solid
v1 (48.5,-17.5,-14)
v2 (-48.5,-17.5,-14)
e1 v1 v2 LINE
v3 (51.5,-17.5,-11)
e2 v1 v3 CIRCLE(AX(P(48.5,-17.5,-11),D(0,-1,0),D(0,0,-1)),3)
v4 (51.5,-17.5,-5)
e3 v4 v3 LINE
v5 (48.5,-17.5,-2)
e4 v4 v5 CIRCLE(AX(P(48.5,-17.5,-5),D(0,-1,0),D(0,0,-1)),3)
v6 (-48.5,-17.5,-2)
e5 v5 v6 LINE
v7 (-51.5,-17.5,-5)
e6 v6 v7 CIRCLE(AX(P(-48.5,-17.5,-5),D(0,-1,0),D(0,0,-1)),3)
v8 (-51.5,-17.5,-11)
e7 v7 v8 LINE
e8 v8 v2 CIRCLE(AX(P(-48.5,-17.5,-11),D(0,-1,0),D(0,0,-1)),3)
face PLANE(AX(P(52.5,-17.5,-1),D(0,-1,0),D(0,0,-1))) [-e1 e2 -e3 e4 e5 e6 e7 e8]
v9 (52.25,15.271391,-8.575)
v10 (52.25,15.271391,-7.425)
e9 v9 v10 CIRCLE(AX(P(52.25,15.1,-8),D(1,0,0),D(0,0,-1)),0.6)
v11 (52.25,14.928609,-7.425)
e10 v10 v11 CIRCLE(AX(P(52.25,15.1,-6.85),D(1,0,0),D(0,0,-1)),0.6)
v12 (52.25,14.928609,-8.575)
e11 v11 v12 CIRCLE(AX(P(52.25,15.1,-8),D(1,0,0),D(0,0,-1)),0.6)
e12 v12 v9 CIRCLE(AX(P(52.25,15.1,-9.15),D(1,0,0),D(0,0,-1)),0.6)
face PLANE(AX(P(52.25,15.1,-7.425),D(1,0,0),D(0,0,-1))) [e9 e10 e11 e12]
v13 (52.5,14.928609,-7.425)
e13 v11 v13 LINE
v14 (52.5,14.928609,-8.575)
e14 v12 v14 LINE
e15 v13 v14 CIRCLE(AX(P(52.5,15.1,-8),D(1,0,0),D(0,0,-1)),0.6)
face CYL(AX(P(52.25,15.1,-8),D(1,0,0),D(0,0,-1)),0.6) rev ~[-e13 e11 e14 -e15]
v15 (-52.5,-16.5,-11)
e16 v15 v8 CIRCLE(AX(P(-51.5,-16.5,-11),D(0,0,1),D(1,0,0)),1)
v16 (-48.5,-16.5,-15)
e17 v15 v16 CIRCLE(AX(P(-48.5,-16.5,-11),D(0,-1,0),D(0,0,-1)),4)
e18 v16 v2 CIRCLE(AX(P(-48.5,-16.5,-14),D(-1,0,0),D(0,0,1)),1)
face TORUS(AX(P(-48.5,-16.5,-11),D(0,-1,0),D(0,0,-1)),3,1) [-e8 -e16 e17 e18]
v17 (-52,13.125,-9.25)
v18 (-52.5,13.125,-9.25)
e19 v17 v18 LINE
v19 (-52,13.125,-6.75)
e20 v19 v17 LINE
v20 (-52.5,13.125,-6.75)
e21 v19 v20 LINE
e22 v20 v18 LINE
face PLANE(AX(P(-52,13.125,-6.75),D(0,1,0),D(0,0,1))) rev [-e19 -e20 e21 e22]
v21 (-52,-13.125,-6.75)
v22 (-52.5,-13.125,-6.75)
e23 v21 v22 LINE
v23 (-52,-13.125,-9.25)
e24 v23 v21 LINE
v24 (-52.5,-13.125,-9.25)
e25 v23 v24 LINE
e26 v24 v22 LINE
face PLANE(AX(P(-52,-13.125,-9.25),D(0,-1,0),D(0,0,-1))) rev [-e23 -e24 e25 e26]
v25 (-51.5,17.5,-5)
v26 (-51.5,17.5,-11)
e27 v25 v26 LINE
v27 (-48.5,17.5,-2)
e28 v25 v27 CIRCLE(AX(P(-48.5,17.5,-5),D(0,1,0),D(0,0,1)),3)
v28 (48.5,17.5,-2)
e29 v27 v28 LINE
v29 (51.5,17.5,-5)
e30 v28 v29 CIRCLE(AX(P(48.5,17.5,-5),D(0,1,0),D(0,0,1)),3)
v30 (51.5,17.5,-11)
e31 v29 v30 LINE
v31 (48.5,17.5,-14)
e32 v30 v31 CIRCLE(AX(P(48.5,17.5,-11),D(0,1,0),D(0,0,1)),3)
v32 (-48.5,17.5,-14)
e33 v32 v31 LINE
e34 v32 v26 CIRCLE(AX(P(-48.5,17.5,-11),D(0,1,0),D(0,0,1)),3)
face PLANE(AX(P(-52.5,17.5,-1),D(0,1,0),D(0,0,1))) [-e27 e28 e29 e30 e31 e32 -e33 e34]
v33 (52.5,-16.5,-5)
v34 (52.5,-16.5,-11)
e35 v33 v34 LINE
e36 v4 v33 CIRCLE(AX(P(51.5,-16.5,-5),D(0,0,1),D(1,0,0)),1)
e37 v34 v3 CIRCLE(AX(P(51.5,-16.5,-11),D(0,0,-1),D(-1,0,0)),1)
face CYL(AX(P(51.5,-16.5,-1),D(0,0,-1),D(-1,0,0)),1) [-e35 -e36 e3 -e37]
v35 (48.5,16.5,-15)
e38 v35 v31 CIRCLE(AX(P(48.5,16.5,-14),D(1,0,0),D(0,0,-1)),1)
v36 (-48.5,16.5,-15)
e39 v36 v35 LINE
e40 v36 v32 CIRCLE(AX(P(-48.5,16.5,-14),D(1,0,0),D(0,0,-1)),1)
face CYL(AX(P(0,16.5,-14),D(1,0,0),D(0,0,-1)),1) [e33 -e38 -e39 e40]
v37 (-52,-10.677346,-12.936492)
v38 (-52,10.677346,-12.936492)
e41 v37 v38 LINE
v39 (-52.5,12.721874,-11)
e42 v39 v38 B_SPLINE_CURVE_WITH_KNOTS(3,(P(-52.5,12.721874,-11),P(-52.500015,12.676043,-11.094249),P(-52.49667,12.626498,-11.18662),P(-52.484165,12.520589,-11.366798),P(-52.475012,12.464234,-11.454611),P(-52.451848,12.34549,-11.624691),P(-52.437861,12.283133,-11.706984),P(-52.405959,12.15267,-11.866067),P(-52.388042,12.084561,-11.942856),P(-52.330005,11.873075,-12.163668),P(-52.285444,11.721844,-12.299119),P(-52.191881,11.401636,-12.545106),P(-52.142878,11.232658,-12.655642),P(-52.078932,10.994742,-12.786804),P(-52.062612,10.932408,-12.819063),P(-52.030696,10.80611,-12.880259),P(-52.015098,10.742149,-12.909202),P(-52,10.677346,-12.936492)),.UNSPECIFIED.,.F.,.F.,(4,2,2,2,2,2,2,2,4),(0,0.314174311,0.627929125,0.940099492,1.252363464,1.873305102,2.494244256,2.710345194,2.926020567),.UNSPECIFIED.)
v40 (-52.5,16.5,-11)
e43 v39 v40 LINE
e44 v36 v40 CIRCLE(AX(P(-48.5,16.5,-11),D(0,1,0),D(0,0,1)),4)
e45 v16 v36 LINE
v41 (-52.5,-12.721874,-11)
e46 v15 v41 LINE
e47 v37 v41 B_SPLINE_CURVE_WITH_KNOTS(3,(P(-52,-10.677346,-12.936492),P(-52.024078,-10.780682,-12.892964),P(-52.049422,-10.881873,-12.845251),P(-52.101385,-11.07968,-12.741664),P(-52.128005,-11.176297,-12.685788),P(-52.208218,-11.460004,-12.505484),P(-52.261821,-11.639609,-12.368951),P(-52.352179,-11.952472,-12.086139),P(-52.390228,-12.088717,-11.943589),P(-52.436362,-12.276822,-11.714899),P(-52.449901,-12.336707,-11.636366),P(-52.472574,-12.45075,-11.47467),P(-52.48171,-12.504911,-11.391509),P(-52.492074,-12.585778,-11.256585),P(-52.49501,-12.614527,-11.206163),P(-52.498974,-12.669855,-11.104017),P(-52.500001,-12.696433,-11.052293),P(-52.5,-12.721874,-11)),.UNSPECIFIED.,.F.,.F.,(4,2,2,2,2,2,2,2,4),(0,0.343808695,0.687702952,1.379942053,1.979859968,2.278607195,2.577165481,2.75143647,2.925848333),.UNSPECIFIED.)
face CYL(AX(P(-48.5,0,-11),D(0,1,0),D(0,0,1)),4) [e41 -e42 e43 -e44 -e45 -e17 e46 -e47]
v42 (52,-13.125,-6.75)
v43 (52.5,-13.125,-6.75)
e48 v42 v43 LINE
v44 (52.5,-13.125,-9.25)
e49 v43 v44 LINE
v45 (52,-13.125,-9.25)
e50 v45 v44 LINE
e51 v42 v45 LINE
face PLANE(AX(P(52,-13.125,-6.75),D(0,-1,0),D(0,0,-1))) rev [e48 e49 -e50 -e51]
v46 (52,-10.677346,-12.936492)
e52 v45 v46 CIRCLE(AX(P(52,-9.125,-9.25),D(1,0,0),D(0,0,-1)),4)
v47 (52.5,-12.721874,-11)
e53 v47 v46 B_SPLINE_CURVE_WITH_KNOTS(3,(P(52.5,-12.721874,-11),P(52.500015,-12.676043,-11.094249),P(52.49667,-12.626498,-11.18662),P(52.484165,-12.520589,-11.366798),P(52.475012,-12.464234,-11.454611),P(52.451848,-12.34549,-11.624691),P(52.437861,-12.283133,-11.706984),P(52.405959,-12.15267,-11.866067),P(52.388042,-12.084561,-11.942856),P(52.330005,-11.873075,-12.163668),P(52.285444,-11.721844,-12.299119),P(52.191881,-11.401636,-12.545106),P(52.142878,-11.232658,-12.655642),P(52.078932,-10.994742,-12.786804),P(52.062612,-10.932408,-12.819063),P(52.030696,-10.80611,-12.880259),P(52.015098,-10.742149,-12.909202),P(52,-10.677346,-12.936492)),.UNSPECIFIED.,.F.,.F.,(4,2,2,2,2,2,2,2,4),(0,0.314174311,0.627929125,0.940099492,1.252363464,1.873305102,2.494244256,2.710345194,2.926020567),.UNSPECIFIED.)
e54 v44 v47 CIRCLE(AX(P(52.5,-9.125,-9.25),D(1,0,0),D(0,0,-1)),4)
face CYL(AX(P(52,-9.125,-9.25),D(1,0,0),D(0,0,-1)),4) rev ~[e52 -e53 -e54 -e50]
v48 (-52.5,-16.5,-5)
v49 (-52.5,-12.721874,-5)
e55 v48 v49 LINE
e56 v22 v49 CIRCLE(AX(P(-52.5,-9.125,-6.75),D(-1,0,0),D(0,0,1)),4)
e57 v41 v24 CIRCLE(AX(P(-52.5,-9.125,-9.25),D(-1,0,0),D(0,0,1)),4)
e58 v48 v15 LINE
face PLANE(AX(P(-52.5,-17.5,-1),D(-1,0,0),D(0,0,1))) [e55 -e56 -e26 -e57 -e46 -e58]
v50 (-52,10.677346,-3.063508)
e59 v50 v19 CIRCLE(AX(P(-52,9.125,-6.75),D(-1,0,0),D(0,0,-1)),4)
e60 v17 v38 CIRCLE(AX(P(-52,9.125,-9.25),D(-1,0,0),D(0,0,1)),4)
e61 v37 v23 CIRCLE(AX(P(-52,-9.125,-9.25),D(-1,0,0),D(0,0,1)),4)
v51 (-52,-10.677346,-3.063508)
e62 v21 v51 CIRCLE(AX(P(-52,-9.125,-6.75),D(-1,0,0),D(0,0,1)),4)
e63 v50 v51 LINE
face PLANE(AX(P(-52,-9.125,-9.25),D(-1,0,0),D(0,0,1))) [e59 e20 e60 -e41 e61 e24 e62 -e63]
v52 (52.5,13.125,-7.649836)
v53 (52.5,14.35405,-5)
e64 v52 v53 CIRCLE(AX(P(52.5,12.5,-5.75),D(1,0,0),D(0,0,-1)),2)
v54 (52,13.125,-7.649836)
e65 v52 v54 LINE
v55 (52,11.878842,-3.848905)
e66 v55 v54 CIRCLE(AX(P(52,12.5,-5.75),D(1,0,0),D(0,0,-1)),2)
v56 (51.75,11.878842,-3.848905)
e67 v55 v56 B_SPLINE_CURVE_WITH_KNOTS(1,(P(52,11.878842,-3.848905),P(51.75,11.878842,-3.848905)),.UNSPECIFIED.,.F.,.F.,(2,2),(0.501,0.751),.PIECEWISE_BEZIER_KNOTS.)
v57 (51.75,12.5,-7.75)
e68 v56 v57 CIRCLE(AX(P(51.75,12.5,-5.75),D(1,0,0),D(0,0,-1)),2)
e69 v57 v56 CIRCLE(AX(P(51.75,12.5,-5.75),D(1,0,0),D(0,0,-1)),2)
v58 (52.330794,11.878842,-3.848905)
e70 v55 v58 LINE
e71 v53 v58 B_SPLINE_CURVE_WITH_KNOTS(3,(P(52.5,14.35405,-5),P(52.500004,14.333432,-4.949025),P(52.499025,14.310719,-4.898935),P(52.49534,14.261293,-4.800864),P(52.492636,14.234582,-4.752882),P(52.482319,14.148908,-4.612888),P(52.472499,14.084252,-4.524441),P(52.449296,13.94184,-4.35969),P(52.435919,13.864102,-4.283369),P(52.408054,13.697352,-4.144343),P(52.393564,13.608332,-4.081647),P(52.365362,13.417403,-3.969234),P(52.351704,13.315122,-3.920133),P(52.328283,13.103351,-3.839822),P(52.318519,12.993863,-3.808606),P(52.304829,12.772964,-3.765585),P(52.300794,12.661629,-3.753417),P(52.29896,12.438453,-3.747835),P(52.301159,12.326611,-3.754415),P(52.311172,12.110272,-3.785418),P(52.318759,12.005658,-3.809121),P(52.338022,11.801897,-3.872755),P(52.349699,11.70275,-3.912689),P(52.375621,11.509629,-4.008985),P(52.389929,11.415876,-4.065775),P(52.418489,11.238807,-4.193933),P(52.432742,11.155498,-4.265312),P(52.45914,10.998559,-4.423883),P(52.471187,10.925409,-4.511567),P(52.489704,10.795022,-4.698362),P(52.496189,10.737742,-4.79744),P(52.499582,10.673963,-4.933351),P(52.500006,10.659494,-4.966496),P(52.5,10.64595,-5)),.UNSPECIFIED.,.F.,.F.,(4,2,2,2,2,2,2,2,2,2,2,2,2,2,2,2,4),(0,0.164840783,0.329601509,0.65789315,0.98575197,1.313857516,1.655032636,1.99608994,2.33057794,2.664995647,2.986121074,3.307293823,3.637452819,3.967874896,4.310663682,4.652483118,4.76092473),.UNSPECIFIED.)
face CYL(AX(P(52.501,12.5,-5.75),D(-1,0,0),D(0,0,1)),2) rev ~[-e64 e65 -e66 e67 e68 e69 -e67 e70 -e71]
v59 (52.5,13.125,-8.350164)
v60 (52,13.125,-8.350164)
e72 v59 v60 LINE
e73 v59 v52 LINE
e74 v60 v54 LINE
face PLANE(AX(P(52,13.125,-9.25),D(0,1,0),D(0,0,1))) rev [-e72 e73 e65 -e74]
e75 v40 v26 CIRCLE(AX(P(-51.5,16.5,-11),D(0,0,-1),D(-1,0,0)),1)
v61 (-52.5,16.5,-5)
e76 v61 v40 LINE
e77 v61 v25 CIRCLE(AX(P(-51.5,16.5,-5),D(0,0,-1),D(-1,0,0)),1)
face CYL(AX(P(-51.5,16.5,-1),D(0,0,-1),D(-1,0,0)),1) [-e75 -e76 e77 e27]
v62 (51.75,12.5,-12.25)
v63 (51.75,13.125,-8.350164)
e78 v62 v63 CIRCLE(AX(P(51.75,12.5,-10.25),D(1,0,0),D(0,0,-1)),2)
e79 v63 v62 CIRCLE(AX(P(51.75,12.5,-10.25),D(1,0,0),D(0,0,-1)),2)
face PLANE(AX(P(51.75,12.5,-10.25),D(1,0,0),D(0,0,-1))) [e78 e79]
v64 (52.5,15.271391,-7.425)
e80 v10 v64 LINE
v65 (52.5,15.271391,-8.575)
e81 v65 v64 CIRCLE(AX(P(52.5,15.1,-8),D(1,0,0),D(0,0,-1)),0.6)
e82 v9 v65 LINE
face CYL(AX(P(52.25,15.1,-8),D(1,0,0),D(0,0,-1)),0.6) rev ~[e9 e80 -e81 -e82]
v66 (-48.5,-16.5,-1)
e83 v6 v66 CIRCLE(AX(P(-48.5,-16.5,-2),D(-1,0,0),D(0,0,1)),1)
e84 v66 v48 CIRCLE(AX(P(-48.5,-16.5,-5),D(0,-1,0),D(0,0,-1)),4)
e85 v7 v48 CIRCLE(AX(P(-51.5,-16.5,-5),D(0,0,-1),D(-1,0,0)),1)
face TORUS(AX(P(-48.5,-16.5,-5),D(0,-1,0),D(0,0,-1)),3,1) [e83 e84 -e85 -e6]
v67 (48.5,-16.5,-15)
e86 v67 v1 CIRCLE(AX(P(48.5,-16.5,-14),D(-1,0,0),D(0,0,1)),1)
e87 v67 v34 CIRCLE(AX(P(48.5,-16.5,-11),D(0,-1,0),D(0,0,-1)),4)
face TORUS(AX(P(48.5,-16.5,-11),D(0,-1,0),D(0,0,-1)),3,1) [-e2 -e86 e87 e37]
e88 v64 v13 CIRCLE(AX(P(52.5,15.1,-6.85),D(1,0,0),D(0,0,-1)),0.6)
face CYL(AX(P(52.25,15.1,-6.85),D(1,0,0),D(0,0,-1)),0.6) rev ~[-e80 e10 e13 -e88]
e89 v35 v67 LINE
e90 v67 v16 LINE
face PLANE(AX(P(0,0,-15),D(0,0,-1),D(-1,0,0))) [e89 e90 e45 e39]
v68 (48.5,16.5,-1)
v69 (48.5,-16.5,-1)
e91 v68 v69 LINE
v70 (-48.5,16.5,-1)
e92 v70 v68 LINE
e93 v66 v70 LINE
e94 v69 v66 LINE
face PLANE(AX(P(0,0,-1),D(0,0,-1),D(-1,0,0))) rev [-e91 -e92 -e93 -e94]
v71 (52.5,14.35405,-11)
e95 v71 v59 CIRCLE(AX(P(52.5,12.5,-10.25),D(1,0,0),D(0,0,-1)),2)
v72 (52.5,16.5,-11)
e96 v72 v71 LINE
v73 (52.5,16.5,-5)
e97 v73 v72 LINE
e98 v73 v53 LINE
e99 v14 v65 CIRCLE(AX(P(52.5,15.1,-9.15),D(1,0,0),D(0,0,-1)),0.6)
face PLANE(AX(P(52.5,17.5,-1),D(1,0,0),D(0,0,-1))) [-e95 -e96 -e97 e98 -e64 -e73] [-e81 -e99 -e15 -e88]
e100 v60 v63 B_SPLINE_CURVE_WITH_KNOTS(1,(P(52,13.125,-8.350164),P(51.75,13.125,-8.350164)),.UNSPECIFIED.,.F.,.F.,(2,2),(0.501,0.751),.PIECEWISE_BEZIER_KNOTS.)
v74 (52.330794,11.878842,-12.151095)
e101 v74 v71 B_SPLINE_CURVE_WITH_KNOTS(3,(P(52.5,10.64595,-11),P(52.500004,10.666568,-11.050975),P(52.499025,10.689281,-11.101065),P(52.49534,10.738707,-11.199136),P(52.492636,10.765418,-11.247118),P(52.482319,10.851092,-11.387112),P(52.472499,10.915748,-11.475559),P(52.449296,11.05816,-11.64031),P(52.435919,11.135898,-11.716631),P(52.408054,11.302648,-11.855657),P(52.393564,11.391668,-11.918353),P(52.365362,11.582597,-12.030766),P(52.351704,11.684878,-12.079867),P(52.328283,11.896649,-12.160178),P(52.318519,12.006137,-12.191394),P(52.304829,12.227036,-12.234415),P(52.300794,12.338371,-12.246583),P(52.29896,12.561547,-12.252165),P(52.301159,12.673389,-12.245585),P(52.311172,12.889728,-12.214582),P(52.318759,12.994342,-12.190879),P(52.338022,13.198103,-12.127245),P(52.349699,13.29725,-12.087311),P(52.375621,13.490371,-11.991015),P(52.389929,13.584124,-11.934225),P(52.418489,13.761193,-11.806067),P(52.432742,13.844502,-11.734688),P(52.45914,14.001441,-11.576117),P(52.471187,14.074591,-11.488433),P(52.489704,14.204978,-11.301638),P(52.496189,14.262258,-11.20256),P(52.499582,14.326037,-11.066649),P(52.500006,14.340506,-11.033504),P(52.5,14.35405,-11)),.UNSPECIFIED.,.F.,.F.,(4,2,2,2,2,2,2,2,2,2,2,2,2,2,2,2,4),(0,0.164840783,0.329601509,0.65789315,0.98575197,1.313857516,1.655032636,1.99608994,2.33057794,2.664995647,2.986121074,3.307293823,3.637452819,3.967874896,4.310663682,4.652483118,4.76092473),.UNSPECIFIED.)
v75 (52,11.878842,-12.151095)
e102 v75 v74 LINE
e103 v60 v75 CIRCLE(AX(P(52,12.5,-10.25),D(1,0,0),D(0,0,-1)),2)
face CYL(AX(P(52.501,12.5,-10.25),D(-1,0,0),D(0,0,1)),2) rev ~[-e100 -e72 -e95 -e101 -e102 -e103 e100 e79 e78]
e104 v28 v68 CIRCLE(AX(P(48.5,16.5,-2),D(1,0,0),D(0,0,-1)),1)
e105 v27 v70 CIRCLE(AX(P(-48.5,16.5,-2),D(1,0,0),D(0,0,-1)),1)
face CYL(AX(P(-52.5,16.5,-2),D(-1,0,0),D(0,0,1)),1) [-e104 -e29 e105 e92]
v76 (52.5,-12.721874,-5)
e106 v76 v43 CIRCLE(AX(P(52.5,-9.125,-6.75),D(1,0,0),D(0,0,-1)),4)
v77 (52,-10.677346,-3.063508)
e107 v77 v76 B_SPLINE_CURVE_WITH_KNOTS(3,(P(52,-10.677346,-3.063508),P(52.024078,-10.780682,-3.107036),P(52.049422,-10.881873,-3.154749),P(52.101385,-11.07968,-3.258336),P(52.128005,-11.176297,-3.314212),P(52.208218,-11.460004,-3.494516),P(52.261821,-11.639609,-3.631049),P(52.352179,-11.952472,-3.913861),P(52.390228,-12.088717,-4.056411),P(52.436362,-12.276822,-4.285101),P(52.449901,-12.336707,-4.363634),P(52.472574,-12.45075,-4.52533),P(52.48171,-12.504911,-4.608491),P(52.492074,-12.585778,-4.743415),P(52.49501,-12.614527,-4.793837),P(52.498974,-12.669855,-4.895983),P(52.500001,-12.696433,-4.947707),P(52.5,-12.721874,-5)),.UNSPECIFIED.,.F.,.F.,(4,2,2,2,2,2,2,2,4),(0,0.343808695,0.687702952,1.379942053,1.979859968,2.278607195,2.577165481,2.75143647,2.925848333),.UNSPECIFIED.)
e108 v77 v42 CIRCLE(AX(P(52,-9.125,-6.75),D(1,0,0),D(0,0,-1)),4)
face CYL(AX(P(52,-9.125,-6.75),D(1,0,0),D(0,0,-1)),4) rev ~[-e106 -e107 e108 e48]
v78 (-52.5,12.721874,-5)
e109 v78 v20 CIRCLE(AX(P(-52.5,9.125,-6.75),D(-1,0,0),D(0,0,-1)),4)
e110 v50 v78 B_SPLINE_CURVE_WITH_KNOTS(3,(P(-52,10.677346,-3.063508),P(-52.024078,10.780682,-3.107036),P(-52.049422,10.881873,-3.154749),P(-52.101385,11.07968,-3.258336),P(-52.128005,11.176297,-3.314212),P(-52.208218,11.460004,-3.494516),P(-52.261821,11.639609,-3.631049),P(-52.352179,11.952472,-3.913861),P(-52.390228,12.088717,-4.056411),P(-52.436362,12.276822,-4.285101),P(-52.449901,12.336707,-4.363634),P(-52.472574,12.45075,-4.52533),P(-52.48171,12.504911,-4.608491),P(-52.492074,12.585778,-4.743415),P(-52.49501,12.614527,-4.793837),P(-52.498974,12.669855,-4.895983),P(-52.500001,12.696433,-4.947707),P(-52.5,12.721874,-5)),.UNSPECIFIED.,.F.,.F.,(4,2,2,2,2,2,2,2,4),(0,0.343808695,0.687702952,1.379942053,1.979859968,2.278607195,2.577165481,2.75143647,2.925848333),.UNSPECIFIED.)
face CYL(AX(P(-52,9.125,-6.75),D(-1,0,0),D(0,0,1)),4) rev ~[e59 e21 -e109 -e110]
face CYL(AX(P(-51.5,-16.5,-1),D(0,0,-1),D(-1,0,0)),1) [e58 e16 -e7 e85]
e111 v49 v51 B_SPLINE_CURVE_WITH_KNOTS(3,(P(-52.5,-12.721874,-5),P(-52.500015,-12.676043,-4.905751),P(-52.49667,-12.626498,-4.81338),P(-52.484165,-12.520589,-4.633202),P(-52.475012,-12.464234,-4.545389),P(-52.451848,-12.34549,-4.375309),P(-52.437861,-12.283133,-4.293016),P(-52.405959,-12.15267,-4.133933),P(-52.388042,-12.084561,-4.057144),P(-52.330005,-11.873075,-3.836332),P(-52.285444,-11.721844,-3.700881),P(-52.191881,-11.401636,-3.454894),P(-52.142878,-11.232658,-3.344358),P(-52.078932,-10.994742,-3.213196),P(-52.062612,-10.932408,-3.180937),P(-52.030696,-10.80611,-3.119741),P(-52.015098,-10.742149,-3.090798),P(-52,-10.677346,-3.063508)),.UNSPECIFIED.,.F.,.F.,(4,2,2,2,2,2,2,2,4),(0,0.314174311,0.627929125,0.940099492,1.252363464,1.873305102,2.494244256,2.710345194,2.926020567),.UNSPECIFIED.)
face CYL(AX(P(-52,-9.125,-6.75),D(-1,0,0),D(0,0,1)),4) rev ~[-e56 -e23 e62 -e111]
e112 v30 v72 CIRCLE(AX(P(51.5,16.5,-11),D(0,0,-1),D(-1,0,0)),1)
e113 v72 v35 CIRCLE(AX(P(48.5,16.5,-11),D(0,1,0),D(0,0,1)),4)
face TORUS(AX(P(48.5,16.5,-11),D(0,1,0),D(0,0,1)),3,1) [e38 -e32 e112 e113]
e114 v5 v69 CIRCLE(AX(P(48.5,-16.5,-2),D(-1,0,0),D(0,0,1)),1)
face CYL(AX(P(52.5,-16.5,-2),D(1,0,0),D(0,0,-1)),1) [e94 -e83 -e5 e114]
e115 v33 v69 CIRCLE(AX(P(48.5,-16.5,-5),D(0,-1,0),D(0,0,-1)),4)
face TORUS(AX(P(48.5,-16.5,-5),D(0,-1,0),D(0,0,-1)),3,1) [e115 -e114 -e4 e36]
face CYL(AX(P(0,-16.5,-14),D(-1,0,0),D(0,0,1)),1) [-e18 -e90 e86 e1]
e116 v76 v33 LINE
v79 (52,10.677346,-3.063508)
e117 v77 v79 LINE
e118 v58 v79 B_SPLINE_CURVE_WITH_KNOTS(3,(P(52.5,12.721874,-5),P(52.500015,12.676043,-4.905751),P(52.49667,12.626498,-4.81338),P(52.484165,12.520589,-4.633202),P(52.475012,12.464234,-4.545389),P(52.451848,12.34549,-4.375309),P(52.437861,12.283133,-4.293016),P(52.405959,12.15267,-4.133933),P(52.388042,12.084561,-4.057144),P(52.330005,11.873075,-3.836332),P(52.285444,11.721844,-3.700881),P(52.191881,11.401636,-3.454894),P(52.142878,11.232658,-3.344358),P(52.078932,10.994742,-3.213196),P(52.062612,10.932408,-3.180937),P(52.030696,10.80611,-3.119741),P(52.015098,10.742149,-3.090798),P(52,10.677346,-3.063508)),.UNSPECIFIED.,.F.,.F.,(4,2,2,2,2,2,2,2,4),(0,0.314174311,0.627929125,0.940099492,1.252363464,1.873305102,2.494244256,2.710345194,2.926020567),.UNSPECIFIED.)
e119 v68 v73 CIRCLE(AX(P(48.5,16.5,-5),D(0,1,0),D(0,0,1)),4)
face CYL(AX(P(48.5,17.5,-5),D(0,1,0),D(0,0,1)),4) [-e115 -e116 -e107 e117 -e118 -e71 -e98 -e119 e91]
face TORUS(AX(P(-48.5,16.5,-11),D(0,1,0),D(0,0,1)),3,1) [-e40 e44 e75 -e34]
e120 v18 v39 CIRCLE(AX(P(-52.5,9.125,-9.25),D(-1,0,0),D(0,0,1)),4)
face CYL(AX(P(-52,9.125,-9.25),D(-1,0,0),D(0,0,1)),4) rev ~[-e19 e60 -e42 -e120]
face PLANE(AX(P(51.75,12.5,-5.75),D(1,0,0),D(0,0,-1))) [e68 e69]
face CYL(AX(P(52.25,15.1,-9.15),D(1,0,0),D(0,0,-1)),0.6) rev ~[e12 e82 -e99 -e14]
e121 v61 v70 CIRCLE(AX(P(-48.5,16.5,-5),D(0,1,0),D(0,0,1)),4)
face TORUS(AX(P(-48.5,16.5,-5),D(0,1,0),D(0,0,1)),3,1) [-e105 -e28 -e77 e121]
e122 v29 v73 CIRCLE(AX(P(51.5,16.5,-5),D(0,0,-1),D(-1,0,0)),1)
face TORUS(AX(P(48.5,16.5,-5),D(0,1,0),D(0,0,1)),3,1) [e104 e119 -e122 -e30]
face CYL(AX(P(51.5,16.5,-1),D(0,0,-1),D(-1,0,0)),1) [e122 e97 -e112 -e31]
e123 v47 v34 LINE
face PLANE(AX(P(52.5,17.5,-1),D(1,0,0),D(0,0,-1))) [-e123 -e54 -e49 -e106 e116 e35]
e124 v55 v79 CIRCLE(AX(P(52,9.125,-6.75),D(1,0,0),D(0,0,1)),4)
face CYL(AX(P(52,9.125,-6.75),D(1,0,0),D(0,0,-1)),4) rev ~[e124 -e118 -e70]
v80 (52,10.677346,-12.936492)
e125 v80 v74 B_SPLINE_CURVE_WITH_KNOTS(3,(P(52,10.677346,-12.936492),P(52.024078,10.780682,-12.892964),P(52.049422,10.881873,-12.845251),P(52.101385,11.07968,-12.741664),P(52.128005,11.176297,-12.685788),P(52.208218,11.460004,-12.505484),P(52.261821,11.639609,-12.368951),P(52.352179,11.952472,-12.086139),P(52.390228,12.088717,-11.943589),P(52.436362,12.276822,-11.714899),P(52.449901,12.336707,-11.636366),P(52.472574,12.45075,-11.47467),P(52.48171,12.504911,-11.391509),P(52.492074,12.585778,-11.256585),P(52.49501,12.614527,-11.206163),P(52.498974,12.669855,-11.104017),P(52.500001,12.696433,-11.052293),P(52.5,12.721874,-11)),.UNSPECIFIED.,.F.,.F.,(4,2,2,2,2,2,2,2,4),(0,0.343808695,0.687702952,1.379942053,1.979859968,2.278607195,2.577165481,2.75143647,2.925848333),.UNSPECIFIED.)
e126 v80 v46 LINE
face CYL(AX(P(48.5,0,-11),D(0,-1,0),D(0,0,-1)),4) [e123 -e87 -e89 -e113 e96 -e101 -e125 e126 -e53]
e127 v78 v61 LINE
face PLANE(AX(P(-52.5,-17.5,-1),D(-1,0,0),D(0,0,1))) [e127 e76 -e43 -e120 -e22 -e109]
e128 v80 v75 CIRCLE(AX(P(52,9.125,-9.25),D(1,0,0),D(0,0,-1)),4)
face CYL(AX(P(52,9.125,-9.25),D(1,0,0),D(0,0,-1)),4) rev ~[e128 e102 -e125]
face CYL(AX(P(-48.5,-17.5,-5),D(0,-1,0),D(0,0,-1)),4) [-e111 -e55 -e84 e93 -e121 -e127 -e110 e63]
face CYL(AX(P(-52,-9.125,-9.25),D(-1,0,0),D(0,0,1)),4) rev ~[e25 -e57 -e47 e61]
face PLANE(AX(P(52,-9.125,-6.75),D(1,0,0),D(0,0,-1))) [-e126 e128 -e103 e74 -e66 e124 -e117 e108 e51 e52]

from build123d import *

# Parameters (mm, degrees)
SKETCH1_W                           = 105
SKETCH1_H                           = 35
BOSS_EXTRUDE1_DEPTH                 = 14
CUT_EXTRUDE1_DEPTH                  = 0.5
CUT_EXTRUDE2_START                  = -0.5
CUT_EXTRUDE2_DEPTH                  = 0.5
FILLET1_R                           = 4
FILLET2_R                           = 1
ESQUISSE1_R                         = 2
ENL_V_MAT_EXTRU_1_DEPTH             = 0.25
ENL_V_MAT_EXTRU_1_DIRECTION_2_REACH = 109.012
ENL_V_MAT_EXTRU_4_DEPTH             = 0.25


with BuildPart() as part:
    # Sketch1 → Boss-Extrude1 (new body)
    with BuildSketch(Plane(origin=(0, 0, -15), x_dir=(-1, 0, 0), z_dir=(0, 0, -1))):
        Rectangle(SKETCH1_W, SKETCH1_H)
    extrude(amount=-BOSS_EXTRUDE1_DEPTH)

    # Sketch2 → Cut-Extrude1 (cut)
    with BuildSketch(Plane(origin=(52.5, 0, 0), x_dir=(0, 0, -1), z_dir=(1, 0, 0))):
        with BuildLine():
            Line((2.75, 9.125), (2.75, -9.125))
            ThreePointArc((2.75, -9.125), (3.921572875, -11.953427125), (6.75, -13.125))
            Line((6.75, -13.125), (9.25, -13.125))
            ThreePointArc((9.25, -13.125), (12.078427125, -11.953427125), (13.25, -9.125))
            Line((13.25, -9.125), (13.25, 9.125))
            ThreePointArc((13.25, 9.125), (12.078427125, 11.953427125), (9.25, 13.125))
            Line((9.25, 13.125), (6.75, 13.125))
            ThreePointArc((6.75, 13.125), (3.921572875, 11.953427125), (2.75, 9.125))
        make_face()
    extrude(amount=-CUT_EXTRUDE1_DEPTH, mode=Mode.SUBTRACT)

    # Sketch3 → Cut-Extrude2 (cut)
    with BuildSketch(Plane.ZY.offset(52.5).offset(CUT_EXTRUDE2_START)):
        with BuildLine():
            Line((-6.75, 13.125), (-9.25, 13.125))
            ThreePointArc((-9.25, 13.125), (-12.078427125, 11.953427125), (-13.25, 9.125))
            Line((-13.25, 9.125), (-13.25, -9.125))
            ThreePointArc((-13.25, -9.125), (-12.078427125, -11.953427125), (-9.25, -13.125))
            Line((-9.25, -13.125), (-6.75, -13.125))
            ThreePointArc((-6.75, -13.125), (-3.921572875, -11.953427125), (-2.75, -9.125))
            Line((-2.75, -9.125), (-2.75, 9.125))
            ThreePointArc((-2.75, 9.125), (-3.921572875, 11.953427125), (-6.75, 13.125))
        make_face()
    extrude(amount=CUT_EXTRUDE2_DEPTH, mode=Mode.SUBTRACT)

    # Fillet1
    # the kernel refuses this fillet: 4 mm, written as the material it takes off along each edge
    with BuildSketch(Plane(origin=(-52.5, -27.5, -15), x_dir=(0, 0, 1), z_dir=(0, 1, 0)), Plane(origin=(52.5, 27.5, -15), x_dir=(0, 0, 1), z_dir=(0, -1, 0))) as fillet1_piece_1:
        with BuildLine():
            CenterArc((FILLET1_R, FILLET1_R), FILLET1_R, 180, 90)
            Line((0, FILLET1_R), (0, 0))
            Line((0, 0), (FILLET1_R, 0))
        make_face()
    extrude(amount=55, mode=Mode.SUBTRACT)
    with BuildSketch(Plane(origin=(-52.5, -27.5, -1), x_dir=(0, 0, -1), z_dir=(0, 1, 0)), Plane(origin=(52.5, 27.5, -1), x_dir=(0, 0, -1), z_dir=(0, -1, 0))) as fillet1_piece_2:
        with BuildLine():
            CenterArc((FILLET1_R, -FILLET1_R), FILLET1_R, 90, 90)
            Line((0, -FILLET1_R), (0, 0))
            Line((0, 0), (FILLET1_R, 0))
        make_face()
    extrude(amount=55, mode=Mode.SUBTRACT)

    # Fillet2
    fillet2_edges = [part.edges().sort_by_distance(p)[0] for p in [
        (0, -17.5, -15),
        (0, 17.5, -15),
        (-52.5, 17.5, -8),
        (0, 17.5, -1),
        (52.5, 17.5, -8),
        (51.328427125, 17.5, -2.171572875),
        (51.328427125, 17.5, -13.828427125),
        (-51.328427125, 17.5, -2.171572875),
        (-51.328427125, 17.5, -13.828427125),
        (-52.5, -17.5, -8),
        (52.5, -17.5, -8),
        (0, -17.5, -1),
        (51.328427125, -17.5, -2.171572875),
        (51.328427125, -17.5, -13.828427125),
        (-51.328427125, -17.5, -2.171572875),
        (-51.328427125, -17.5, -13.828427125),
    ]]
    fillet(fillet2_edges, radius=FILLET2_R)

    # Esquisse1 → Enlèv. mat.-Extru.1 (cut)
    with BuildSketch(Plane(origin=(52, 0, 0), x_dir=(0, 0, -1), z_dir=(1, 0, 0))):
        with Locations(Location((5.75, 12.5, 0), (0, 0, 198.094122224))):
            Circle(ESQUISSE1_R)
        with Locations(Location((10.25, 12.5, 0), (0, 0, 161.790043136))):
            Circle(ESQUISSE1_R)
    extrude(amount=-ENL_V_MAT_EXTRU_1_DEPTH, mode=Mode.SUBTRACT)

    # Esquisse1 → Enlèv. mat.-Extru.1 direction 2 (cut, up to next)
    with BuildSketch(Plane(origin=(52, 0, 0), x_dir=(0, 0, -1), z_dir=(1, 0, 0)), mode=Mode.PRIVATE) as enl_v_mat_extru_1_direction_2_sk1:
        with Locations(Location((5.75, 12.5, 0), (0, 0, 198.094122224))):
            Circle(ESQUISSE1_R)
    enl_v_mat_extru_1_direction_2_tool1 = extrude(enl_v_mat_extru_1_direction_2_sk1.sketch, amount=ENL_V_MAT_EXTRU_1_DIRECTION_2_REACH, mode=Mode.PRIVATE) & part.part
    # Esquisse1 → Enlèv. mat.-Extru.1 direction 2 (cut, up to next)
    with BuildSketch(Plane(origin=(52, 0, 0), x_dir=(0, 0, -1), z_dir=(1, 0, 0)), mode=Mode.PRIVATE) as enl_v_mat_extru_1_direction_2_sk2:
        with Locations(Location((10.25, 12.5, 0), (0, 0, 161.790043136))):
            Circle(ESQUISSE1_R)
    enl_v_mat_extru_1_direction_2_tool2 = extrude(enl_v_mat_extru_1_direction_2_sk2.sketch, amount=ENL_V_MAT_EXTRU_1_DIRECTION_2_REACH, mode=Mode.PRIVATE) & part.part
    add(enl_v_mat_extru_1_direction_2_tool1.solids().sort_by_distance((52, 12.5, -5.75))[0], mode=Mode.SUBTRACT)
    add(enl_v_mat_extru_1_direction_2_tool2.solids().sort_by_distance((52, 12.5, -10.25))[0], mode=Mode.SUBTRACT)

    # Esquisse2 → Enlèv. mat.-Extru.4 (cut)
    with BuildSketch(Plane(origin=(52.5, 0, 0), x_dir=(0, 0, -1), z_dir=(1, 0, 0))):
        with BuildLine():
            ThreePointArc((7.425, 14.928608635), (8, 14.5), (8.575, 14.928608635))
            ThreePointArc((8.575, 14.928608635), (9.75, 15.1), (8.575, 15.271391365))
            ThreePointArc((8.575, 15.271391365), (8, 15.7), (7.425, 15.271391365))
            ThreePointArc((7.425, 15.271391365), (6.25, 15.1), (7.425, 14.928608635))
        make_face()
    extrude(amount=-ENL_V_MAT_EXTRU_4_DEPTH, mode=Mode.SUBTRACT)


solid = part.part
